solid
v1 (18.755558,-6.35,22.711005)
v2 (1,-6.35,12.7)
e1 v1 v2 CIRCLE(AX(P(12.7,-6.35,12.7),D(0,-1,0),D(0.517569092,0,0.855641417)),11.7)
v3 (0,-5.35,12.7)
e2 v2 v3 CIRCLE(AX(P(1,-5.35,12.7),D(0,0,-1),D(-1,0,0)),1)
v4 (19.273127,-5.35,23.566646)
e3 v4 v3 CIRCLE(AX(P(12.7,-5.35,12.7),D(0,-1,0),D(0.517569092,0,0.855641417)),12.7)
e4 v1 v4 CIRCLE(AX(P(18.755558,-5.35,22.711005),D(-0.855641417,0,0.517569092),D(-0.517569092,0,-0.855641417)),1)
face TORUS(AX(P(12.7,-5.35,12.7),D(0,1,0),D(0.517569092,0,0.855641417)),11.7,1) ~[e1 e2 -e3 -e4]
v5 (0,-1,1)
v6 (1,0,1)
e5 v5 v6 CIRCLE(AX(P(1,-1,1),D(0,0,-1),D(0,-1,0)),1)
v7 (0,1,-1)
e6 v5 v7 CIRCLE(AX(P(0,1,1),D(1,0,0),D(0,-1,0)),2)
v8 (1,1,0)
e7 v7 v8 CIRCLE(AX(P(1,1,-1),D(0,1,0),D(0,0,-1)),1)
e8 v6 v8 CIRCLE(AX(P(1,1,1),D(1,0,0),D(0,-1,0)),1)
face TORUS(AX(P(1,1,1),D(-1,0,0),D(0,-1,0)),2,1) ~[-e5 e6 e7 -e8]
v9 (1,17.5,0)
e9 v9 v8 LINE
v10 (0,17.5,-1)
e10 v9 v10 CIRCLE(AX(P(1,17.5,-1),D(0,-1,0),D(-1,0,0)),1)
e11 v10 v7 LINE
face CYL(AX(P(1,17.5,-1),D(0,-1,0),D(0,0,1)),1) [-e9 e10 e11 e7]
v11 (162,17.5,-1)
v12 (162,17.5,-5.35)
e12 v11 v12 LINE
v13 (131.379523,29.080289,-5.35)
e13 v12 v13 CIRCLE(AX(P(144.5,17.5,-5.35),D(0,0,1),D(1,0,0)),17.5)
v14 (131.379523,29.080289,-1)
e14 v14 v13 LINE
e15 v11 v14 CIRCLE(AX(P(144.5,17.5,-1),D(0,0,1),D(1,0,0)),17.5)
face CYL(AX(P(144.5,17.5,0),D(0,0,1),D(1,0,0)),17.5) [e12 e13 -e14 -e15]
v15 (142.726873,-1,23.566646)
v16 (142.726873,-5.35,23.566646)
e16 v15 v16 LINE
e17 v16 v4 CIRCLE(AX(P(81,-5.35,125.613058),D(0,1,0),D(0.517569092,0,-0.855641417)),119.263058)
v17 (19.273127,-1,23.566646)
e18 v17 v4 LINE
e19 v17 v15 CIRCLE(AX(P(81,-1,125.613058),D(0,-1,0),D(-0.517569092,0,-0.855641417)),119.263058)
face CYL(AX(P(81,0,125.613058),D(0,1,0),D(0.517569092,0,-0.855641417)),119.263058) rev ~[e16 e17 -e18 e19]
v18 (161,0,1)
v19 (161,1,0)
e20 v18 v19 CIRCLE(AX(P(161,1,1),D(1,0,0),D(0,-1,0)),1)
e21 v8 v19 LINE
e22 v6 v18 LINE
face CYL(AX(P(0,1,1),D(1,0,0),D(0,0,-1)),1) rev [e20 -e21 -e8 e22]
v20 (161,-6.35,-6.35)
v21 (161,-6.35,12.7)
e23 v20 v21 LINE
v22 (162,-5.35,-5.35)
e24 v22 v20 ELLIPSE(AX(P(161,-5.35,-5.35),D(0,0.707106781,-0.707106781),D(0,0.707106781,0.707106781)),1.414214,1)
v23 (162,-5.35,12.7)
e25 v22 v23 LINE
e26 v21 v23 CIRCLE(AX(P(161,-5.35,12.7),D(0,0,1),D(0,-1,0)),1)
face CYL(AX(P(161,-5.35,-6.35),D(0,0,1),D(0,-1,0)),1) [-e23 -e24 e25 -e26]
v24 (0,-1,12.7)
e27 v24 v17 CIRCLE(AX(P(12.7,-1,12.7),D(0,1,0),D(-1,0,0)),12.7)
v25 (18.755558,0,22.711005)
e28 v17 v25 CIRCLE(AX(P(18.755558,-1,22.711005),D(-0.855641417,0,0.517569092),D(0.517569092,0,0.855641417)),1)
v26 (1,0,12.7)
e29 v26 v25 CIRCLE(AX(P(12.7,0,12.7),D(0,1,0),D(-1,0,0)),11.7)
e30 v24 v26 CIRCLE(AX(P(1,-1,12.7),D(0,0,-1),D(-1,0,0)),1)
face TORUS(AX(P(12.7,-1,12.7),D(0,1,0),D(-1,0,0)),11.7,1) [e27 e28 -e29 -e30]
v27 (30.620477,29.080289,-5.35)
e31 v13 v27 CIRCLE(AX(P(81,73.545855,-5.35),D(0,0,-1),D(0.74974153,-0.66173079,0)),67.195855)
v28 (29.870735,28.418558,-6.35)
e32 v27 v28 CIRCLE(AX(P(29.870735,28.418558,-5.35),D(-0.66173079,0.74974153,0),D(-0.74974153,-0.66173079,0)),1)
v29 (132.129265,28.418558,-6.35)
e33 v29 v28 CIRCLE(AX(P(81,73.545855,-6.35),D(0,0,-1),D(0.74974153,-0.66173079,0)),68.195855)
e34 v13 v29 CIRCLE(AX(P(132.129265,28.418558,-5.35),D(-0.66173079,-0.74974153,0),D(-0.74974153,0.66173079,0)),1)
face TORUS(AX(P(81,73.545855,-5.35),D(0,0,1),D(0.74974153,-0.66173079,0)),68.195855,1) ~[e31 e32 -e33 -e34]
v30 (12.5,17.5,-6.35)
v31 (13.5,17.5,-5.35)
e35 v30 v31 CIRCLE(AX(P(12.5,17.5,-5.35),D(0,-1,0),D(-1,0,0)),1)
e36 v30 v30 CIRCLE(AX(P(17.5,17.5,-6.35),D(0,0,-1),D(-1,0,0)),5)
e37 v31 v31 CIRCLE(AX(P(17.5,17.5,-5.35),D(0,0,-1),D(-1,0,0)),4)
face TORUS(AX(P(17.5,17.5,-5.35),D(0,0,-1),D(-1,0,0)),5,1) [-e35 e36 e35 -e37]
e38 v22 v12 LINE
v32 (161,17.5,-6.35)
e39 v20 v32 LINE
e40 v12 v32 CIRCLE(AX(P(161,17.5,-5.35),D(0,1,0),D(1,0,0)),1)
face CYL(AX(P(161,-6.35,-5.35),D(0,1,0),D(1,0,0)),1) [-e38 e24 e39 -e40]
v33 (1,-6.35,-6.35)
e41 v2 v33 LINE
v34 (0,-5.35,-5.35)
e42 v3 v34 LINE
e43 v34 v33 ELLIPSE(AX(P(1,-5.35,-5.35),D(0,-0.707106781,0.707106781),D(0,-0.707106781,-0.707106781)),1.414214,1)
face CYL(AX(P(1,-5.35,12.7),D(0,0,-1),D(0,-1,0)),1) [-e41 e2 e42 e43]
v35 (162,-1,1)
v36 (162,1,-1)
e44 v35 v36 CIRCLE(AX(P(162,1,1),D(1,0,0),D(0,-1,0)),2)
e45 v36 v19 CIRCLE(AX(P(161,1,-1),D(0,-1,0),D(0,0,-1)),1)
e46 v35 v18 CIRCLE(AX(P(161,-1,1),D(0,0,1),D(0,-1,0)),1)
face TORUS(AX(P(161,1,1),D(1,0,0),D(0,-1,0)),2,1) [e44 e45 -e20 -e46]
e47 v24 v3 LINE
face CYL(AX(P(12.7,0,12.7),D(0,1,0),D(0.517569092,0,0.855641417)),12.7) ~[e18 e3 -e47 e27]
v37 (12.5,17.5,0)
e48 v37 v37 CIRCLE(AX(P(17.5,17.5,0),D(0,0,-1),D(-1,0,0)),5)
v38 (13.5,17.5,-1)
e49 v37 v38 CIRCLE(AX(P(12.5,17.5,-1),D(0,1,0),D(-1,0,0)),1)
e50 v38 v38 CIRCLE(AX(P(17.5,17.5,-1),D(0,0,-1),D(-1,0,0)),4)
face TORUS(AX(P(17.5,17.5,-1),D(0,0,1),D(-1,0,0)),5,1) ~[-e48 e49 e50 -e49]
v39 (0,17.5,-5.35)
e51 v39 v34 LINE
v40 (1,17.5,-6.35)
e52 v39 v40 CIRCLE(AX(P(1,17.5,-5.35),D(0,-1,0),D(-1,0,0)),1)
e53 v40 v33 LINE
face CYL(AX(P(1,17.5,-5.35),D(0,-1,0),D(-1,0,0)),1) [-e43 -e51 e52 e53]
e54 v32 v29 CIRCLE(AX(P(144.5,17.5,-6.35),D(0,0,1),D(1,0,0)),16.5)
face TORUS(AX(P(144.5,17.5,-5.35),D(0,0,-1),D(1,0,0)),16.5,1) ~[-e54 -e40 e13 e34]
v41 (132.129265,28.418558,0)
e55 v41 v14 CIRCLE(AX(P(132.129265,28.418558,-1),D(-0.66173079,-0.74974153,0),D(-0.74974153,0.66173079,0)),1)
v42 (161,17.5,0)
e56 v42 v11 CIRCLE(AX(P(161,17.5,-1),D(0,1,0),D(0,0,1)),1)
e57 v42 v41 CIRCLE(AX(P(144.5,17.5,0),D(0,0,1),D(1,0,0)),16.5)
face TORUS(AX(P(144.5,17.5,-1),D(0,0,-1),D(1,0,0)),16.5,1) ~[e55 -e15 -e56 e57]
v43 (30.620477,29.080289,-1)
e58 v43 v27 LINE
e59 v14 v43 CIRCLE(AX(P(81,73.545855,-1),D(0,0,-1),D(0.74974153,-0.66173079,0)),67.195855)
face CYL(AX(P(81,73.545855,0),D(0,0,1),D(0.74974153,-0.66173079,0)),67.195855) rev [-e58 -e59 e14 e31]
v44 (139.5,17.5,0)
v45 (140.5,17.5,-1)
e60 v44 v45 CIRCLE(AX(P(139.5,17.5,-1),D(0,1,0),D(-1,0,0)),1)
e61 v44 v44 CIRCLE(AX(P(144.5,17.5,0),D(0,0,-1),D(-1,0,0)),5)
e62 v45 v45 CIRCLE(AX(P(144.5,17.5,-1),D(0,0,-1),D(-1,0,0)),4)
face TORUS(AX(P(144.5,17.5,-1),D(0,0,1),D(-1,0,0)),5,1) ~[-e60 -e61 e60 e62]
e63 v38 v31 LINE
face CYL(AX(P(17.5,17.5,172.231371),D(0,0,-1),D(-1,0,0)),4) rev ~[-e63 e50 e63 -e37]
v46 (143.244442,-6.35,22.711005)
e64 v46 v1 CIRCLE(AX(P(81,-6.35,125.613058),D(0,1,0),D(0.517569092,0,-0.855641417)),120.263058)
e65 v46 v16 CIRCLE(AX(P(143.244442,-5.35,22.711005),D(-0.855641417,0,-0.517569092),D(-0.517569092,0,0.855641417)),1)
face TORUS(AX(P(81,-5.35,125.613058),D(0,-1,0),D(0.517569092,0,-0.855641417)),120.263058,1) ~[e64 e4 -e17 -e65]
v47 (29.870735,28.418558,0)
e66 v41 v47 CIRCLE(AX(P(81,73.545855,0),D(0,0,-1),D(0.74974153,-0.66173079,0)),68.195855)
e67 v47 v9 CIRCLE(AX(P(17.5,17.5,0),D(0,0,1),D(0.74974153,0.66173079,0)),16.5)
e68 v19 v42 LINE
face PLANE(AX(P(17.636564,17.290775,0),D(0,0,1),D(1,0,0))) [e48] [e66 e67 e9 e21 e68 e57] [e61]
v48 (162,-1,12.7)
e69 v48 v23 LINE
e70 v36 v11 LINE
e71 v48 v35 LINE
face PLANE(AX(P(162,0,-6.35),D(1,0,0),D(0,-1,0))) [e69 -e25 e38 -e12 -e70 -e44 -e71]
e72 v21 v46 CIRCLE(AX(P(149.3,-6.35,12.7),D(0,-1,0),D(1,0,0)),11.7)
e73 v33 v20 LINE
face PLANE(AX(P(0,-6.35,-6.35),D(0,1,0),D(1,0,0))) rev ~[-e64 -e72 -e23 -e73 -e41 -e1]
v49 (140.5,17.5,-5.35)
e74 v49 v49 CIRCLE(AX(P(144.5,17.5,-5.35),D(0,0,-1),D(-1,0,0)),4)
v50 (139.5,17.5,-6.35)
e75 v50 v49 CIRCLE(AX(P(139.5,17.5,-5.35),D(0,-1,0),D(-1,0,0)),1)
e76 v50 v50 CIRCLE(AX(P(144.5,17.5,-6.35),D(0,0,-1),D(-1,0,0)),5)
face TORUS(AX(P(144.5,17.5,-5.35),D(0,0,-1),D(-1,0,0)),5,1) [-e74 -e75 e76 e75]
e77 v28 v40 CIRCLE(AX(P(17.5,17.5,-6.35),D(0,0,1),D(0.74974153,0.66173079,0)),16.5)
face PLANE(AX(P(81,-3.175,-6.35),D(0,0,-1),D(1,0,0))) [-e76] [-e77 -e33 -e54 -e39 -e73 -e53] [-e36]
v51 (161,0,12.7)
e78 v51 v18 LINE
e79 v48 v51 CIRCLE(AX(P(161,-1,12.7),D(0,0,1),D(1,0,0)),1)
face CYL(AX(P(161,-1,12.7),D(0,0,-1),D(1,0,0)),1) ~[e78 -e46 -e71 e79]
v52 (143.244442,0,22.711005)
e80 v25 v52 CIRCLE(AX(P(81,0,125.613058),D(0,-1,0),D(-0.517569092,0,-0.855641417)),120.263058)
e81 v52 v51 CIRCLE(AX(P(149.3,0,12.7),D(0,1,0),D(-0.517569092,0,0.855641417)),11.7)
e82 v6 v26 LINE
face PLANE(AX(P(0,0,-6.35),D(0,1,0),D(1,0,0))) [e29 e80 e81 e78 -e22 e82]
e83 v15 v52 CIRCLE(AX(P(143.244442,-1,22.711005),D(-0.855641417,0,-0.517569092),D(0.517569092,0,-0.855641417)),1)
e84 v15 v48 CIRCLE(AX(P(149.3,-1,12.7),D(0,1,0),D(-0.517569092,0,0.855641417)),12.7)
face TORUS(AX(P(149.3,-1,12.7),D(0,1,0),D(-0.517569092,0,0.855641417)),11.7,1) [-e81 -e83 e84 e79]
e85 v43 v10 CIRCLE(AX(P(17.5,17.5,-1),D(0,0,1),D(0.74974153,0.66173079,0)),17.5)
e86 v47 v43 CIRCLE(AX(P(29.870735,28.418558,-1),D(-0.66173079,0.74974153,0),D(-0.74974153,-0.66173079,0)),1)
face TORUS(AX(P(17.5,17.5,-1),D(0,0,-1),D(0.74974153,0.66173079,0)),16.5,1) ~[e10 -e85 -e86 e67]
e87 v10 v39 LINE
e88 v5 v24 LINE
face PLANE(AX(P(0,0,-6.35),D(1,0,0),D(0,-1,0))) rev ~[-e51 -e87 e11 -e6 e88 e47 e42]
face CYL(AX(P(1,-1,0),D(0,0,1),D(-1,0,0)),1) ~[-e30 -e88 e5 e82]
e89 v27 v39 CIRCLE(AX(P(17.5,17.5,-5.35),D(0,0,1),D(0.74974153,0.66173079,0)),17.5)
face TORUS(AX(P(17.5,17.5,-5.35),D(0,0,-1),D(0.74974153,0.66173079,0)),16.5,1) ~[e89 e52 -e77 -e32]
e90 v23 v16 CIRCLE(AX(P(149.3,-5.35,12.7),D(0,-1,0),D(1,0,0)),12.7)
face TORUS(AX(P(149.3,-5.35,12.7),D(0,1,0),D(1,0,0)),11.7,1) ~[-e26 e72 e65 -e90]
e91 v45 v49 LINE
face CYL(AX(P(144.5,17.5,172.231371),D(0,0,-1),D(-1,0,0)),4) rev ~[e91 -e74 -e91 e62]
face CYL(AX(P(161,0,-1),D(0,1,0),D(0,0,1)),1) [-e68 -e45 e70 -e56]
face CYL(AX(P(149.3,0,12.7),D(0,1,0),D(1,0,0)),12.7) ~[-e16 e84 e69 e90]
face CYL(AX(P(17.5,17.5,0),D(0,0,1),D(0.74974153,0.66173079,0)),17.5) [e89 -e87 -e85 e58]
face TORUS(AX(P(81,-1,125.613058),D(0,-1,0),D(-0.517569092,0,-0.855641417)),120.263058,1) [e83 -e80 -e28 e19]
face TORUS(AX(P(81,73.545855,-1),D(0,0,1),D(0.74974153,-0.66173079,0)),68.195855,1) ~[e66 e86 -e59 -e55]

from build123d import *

# Parameters (mm, degrees)
F1_DEPTH = 6.35
F2_W     = 162
F2_H     = 6.35
F3_DEPTH = 41.35
F5_D     = 8
F7_DEPTH = 6.35
F8_R     = 1


with BuildPart() as f1:
    # F0 (on Top) → F1 (new body)
    with BuildSketch(Plane.XY):
        with BuildLine():
            ThreePointArc((17.5, 0), (29.8743686708, 5.1256313292), (35, 17.5))
            ThreePointArc((35, 17.5), (33.8685421385, 23.6903819156), (30.6204767701, 29.0802888273))
            ThreePointArc((30.6204767701, 29.0802888273), (11.3096180844, 33.8685421385), (0, 17.5))
            ThreePointArc((0, 17.5), (5.1256313292, 5.1256313292), (17.5, 0))
        make_face()
        with BuildLine():
            Line((0, 0), (17.5, 0))
            ThreePointArc((17.5, 0), (5.1256313292, 5.1256313292), (0, 17.5))
            Line((0, 17.5), (0, 0))
        make_face()
        with BuildLine():
            ThreePointArc((30.6204767701, 29.0802888273), (33.8685421385, 23.6903819156), (35, 17.5))
            ThreePointArc((35, 17.5), (29.8743686708, 5.1256313292), (17.5, 0))
            Line((17.5, 0), (144.5, 0))
            ThreePointArc((144.5, 0), (128.5484318251, 10.3029538864), (131.3795232299, 29.0802888273))
            ThreePointArc((131.3795232299, 29.0802888273), (81, 6.35), (30.6204767701, 29.0802888273))
        make_face()
        with BuildLine():
            ThreePointArc((162, 17.5), (150.6903819156, 33.8685421385), (131.3795232299, 29.0802888273))
            ThreePointArc((131.3795232299, 29.0802888273), (128.5484318251, 10.3029538864), (144.5, 0))
            ThreePointArc((144.5, 0), (156.8743686708, 5.1256313292), (162, 17.5))
        make_face()
        with BuildLine():
            ThreePointArc((162, 17.5), (156.8743686708, 5.1256313292), (144.5, 0))
            Line((144.5, 0), (162, 0))
            Line((162, 0), (162, 17.5))
        make_face()
    extrude(amount=-F1_DEPTH)

    # F2 (on face) → F3 (join)
    with BuildSketch(Plane(origin=(0, 0, -6.35), x_dir=(1, 0, 0), z_dir=(0, 0, -1))):
        with Locations((81, 3.175)):
            Rectangle(F2_W, F2_H)
    extrude(amount=-F3_DEPTH)

    # F5 (through all)
    with Locations(Plane.XY):
        with Locations((17.5, 17.5), (144.5, 17.5)):
            Hole(F5_D / 2)

    # F6 (on face) → F7 (cut, through all)
    with BuildSketch(Plane(origin=(0, 0, 0), x_dir=(-1, 0, 0), z_dir=(0, 1, 0))):
        with BuildLine():
            ThreePointArc((-19.273127471, 23.5666459982), (-6.4625613783, 23.7627464691), (0, 12.7))
            Line((0, 12.7), (0, 35))
            Line((0, 35), (-162, 35))
            Line((-162, 35), (-162, 12.7))
            ThreePointArc((-162, 12.7), (-155.5374386217, 23.7627464691), (-142.726872529, 23.5666459982))
            ThreePointArc((-142.726872529, 23.5666459982), (-81, 6.35), (-19.273127471, 23.5666459982))
        make_face()
    extrude(amount=-F7_DEPTH, mode=Mode.SUBTRACT)

    # F8
    f8_edges = [f1.edges().sort_by_distance(p)[0] for p in [
        (150.690382, 33.868542, 0),
        (81, 0, 0),
        (11.309618, 33.868542, -6.35),
        (6.462561, -6.35, 23.762746),
        (11.309618, 33.868542, 0),
        (81, 6.35, 0),
        (81, 6.35, -6.35),
        (0, 8.75, 0),
        (0, 0, 6.35),
        (0, -6.35, 3.175),
        (0, 5.575, -6.35),
        (162, 8.75, 0),
        (13.5, 17.5, 0),
        (140.5, 17.5, 0),
        (150.690382, 33.868542, -6.35),
        (162, 5.575, -6.35),
        (13.5, 17.5, -6.35),
        (140.5, 17.5, -6.35),
        (162, 0, 6.35),
        (155.537439, 0, 23.762746),
        (81, 0, 6.35),
        (6.462561, 0, 23.762746),
        (81, -6.35, 6.35),
        (155.537439, -6.35, 23.762746),
        (162, -6.35, 3.175),
    ]]
    fillet(f8_edges, radius=F8_R)


solid = f1.part
